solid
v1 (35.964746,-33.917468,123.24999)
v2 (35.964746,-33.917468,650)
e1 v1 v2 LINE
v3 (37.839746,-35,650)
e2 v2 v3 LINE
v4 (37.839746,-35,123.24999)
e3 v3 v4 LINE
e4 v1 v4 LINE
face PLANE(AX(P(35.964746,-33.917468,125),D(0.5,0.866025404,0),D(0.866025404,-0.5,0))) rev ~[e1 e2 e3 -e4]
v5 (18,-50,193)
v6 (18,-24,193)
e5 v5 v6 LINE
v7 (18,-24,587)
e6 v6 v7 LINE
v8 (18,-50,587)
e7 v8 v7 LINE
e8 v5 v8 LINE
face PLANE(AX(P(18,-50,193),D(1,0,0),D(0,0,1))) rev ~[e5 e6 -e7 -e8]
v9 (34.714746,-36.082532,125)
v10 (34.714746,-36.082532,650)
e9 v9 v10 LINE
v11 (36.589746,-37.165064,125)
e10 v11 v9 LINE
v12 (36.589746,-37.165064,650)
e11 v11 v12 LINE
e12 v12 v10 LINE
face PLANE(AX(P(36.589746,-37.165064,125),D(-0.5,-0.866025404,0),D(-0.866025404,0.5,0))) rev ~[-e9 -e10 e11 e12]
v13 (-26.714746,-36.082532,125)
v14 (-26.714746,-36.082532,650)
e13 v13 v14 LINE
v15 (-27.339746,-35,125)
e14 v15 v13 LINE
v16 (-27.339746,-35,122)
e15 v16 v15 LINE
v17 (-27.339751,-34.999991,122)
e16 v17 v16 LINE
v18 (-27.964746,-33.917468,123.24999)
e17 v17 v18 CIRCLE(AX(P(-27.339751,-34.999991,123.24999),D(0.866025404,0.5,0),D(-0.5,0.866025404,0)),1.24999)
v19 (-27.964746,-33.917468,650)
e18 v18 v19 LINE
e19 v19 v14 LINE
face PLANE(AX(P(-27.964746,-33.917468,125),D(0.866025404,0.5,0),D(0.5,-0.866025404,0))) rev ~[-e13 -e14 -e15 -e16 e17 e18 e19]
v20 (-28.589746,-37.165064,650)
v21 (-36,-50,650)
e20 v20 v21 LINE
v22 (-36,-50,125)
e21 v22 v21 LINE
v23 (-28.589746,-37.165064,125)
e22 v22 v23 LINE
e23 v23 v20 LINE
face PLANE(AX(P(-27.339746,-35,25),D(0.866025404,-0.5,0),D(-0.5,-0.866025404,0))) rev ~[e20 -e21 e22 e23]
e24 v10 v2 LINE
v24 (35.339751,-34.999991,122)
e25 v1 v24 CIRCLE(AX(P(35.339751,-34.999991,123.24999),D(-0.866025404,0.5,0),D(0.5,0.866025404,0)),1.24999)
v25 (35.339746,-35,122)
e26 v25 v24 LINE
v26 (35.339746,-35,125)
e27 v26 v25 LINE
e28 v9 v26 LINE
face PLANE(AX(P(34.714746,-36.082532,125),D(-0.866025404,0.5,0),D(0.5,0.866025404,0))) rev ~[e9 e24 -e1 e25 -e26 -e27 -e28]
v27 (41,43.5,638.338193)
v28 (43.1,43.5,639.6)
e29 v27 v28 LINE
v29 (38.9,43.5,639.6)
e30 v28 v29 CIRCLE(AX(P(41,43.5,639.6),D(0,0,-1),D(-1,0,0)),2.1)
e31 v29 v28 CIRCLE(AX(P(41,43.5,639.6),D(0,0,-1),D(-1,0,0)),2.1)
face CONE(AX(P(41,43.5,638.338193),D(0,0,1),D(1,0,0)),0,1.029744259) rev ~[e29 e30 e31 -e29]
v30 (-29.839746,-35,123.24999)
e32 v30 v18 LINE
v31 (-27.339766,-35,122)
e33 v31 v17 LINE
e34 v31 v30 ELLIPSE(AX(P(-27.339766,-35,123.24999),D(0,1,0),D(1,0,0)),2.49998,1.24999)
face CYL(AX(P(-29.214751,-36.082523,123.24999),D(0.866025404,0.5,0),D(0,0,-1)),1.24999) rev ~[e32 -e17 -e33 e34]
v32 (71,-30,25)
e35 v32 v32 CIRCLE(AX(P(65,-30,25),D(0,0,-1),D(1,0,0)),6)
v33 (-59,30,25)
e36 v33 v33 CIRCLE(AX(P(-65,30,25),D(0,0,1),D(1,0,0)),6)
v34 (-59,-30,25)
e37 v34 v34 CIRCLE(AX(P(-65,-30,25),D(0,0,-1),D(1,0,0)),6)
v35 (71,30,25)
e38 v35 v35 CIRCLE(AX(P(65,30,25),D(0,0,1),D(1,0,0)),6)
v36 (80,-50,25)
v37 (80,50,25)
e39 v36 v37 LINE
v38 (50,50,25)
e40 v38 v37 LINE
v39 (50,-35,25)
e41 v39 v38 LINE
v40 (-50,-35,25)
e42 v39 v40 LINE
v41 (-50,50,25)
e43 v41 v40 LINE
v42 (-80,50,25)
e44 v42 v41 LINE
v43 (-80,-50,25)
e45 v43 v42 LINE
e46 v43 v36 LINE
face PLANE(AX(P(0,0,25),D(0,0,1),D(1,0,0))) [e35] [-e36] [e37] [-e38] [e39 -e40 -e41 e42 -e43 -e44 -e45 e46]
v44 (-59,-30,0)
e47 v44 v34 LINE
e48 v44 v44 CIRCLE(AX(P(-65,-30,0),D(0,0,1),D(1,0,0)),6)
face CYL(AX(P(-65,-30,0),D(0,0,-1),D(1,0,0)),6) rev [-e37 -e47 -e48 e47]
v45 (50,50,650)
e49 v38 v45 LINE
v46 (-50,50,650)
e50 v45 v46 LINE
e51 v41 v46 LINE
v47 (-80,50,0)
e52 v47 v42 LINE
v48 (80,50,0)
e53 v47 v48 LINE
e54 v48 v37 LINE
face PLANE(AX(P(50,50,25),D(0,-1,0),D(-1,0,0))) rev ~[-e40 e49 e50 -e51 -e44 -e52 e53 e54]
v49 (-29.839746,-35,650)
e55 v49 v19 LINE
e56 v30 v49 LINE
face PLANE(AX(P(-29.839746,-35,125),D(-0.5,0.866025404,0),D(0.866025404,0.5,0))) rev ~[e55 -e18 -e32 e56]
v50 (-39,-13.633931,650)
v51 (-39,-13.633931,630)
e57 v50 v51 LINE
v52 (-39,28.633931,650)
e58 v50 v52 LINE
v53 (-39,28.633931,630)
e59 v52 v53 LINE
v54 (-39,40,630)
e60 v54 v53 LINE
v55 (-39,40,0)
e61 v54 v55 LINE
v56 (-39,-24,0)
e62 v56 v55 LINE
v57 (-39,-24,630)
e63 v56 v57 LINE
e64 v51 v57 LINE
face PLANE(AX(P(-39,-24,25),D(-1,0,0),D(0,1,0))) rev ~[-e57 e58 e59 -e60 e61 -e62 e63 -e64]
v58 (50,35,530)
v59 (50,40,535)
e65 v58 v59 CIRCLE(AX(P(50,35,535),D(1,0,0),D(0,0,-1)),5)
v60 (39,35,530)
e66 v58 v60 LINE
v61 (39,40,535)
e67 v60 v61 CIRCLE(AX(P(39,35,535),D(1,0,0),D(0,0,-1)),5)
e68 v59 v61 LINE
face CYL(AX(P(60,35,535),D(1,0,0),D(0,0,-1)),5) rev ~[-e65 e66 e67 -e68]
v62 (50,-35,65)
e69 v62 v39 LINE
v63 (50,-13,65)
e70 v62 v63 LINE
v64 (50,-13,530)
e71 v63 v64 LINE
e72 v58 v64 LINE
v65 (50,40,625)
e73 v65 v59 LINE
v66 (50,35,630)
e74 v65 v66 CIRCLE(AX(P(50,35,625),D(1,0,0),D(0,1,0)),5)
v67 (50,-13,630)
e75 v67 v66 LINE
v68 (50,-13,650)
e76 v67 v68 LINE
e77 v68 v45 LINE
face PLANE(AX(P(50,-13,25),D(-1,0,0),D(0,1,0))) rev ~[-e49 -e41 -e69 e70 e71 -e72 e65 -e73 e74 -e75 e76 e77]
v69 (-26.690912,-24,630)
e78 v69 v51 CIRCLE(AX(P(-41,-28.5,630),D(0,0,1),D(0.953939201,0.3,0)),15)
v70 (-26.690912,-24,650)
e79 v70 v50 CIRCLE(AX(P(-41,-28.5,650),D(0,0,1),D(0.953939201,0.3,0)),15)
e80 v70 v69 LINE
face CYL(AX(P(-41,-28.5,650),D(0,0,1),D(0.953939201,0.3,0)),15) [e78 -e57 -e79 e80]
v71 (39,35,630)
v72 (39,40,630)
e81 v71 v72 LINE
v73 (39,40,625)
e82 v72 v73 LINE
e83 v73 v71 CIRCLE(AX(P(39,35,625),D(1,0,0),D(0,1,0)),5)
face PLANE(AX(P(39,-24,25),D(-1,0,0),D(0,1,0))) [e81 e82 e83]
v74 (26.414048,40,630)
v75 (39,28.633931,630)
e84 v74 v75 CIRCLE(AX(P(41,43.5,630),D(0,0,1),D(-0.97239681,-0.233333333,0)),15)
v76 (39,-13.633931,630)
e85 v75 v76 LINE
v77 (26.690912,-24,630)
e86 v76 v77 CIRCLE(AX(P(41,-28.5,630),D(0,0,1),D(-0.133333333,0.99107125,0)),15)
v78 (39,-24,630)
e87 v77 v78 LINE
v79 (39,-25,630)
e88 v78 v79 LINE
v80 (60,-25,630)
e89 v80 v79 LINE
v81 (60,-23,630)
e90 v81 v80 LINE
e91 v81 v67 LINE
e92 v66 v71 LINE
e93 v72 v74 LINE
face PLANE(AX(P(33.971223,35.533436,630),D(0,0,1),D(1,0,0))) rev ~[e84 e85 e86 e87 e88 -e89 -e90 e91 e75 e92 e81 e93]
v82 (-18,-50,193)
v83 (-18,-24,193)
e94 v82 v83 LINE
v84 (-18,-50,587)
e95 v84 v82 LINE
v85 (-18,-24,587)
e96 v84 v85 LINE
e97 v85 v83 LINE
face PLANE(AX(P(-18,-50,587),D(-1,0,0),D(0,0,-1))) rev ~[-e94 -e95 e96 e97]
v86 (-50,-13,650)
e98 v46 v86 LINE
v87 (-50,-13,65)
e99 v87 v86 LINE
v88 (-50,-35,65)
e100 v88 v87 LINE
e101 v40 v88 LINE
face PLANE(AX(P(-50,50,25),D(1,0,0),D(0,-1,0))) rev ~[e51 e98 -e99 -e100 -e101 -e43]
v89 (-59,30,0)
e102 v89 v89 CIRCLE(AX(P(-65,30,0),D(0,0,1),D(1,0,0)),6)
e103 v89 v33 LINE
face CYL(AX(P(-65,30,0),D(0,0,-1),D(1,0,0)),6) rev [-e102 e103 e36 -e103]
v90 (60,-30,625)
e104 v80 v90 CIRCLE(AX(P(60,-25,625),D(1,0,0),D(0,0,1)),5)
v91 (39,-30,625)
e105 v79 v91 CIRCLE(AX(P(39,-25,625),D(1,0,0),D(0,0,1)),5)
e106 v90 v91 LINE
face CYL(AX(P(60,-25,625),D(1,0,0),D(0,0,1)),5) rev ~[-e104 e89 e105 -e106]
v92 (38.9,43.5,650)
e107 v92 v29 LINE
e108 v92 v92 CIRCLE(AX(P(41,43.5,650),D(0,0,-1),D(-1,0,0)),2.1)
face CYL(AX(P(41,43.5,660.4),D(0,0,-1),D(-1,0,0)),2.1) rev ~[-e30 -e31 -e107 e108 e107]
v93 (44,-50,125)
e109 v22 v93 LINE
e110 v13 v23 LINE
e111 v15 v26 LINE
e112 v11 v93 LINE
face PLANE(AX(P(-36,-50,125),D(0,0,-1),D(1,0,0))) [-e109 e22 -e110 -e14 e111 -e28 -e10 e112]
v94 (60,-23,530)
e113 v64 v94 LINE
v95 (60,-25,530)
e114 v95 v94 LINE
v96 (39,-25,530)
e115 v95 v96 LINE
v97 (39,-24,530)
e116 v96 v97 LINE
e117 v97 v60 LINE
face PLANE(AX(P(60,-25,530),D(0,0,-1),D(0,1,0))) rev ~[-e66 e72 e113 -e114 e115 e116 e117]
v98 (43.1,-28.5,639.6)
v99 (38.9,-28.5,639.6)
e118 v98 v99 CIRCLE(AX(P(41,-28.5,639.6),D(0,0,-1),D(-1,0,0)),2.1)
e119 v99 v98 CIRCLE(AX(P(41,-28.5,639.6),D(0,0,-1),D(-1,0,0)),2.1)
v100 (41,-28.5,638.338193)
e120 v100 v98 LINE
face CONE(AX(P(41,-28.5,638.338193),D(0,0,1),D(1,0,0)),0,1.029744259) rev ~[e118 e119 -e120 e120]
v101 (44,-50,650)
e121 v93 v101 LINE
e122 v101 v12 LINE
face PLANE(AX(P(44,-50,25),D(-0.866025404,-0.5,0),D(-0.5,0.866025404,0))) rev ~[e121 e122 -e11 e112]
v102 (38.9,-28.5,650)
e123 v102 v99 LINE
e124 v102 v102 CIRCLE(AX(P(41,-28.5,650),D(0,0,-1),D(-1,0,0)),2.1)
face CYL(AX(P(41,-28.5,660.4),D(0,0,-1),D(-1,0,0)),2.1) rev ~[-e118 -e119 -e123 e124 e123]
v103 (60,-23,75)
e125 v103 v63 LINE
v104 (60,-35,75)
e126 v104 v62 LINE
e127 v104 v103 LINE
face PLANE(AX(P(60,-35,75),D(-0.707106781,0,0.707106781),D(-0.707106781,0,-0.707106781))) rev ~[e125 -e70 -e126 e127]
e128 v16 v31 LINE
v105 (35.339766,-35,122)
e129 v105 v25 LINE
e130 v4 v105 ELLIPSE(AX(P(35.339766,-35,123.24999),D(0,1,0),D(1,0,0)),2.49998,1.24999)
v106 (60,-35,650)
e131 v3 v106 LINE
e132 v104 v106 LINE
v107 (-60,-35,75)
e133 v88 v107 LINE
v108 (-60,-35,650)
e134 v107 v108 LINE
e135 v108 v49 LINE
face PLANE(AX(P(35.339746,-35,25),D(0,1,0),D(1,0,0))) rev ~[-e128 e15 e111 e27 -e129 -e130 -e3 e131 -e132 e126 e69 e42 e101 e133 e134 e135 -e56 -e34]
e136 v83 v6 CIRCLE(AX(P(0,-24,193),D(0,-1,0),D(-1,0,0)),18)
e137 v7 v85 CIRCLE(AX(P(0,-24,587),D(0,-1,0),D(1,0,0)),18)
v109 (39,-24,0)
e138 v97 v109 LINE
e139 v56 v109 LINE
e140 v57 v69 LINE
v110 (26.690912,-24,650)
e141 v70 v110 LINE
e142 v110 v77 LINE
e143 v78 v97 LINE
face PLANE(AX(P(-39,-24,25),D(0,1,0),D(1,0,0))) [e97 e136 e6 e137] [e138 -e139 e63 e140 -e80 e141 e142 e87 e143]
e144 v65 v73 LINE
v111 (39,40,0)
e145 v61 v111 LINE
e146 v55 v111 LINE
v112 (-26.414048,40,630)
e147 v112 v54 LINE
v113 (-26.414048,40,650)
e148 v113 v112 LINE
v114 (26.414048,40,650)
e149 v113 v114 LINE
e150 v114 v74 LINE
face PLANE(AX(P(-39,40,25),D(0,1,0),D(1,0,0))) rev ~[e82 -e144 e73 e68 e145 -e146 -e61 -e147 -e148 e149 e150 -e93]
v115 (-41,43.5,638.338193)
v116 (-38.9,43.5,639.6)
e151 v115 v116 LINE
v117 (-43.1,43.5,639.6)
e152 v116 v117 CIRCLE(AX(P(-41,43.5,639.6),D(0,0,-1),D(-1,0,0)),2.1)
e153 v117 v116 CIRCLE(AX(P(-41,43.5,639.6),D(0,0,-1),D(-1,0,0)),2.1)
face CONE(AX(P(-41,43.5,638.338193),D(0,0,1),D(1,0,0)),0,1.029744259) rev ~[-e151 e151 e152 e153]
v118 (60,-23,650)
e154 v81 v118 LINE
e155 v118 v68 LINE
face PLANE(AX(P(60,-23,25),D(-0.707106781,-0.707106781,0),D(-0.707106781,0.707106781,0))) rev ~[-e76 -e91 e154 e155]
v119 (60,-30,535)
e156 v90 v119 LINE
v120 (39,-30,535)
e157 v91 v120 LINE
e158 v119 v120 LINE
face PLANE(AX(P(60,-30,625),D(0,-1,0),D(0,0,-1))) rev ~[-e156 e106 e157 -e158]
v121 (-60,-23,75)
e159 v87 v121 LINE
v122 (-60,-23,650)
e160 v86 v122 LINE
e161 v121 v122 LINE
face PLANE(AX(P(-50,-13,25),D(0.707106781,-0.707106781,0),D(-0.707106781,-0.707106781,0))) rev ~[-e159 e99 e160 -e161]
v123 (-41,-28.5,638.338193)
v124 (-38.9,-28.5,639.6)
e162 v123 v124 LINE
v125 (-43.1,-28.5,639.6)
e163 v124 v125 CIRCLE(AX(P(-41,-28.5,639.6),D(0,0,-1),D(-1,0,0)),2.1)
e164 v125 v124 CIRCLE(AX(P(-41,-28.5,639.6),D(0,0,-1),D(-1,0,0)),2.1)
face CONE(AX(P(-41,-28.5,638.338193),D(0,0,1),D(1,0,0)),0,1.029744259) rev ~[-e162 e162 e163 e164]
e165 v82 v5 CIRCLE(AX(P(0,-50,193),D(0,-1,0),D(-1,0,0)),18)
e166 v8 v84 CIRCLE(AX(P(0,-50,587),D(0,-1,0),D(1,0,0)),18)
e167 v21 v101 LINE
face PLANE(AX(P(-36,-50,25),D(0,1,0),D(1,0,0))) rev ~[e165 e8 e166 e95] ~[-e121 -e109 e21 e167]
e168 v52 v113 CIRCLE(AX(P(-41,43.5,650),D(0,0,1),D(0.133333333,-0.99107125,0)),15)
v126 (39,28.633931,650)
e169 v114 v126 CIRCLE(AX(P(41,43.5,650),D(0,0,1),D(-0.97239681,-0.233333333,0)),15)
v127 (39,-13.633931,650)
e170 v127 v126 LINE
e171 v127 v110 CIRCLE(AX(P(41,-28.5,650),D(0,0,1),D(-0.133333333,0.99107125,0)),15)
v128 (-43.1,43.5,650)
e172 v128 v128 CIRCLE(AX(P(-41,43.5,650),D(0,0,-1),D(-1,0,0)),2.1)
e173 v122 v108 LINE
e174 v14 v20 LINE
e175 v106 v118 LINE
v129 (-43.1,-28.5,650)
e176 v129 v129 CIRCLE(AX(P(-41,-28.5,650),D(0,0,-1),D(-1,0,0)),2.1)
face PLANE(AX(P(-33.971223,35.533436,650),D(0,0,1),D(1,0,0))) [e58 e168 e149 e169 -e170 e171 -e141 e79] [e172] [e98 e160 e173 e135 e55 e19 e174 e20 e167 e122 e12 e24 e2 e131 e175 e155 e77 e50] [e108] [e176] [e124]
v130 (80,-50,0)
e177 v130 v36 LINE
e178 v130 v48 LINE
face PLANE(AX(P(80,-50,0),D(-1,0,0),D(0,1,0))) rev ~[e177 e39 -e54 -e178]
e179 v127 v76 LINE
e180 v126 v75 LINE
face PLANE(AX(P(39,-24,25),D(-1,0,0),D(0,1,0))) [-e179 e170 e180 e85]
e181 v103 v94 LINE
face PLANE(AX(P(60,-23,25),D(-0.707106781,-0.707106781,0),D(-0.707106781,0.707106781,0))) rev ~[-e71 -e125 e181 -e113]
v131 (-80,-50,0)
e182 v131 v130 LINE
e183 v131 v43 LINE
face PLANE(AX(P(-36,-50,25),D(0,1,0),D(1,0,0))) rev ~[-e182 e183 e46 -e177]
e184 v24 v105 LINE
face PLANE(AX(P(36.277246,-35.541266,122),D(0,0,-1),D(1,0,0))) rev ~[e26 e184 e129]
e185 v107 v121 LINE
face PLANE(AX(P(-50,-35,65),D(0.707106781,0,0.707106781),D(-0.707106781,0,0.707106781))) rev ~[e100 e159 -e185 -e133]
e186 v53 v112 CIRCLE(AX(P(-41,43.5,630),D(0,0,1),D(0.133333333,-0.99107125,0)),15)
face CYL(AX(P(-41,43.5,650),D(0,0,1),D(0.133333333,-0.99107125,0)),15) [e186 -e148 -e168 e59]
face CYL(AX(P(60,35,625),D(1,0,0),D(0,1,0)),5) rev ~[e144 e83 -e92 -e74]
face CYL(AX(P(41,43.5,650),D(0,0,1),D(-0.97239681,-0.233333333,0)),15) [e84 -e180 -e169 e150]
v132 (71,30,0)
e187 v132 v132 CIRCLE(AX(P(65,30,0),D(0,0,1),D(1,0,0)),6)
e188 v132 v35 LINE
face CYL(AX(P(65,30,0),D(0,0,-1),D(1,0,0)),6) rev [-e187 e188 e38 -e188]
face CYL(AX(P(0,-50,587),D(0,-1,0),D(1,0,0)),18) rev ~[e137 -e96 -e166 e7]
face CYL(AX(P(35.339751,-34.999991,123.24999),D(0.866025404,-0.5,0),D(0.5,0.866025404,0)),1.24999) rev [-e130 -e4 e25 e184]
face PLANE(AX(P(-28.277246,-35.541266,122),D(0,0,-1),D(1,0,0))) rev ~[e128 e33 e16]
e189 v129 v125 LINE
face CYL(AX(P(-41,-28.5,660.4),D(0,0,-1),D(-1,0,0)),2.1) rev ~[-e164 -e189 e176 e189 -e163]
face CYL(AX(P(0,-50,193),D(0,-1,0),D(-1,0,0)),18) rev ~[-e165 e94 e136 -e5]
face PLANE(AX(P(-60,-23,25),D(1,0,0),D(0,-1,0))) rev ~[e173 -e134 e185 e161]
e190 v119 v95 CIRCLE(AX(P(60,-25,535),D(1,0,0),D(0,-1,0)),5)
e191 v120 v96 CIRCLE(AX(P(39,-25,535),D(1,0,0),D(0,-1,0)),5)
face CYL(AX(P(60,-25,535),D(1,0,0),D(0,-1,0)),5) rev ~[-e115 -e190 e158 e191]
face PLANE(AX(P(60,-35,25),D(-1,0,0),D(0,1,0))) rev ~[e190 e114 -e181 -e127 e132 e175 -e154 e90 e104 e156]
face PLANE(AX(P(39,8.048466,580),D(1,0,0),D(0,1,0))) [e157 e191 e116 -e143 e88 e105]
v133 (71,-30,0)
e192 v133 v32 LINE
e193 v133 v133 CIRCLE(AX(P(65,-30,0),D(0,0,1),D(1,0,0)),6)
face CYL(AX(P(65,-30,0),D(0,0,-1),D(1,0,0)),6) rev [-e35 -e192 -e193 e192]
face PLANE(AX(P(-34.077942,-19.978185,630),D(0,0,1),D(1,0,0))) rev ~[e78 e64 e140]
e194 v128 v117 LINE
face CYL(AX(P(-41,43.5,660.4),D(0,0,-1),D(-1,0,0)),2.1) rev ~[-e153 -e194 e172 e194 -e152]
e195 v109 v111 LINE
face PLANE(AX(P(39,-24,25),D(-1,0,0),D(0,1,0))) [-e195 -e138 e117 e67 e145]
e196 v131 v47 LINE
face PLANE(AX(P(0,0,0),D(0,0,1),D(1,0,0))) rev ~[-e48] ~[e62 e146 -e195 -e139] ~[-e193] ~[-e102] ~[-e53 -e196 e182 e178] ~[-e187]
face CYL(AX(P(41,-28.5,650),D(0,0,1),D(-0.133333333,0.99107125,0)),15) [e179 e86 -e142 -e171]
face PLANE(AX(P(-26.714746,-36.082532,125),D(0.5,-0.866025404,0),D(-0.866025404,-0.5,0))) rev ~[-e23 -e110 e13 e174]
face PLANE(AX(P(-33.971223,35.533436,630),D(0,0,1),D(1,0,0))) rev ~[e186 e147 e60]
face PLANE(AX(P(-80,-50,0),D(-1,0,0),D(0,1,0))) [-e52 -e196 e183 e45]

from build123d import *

# Parameters (mm, degrees)
F0_W           = 160
F0_H           = 100
F0_R           = 6
F0_W_2         = 78
F0_H_2         = 64
F1_DEPTH       = 25
F2_W           = 78
F2_H           = 64
F3_DEPTH       = 625
F5_DEPTH       = 26
F6_W           = 80
F6_H           = 100
F7_DEPTH       = 15
F9_DEPTH       = 22
F11_D          = 4.2
F11_DEPTH      = 10.4
F11_TIP        = 1.2618073
F13_DEPTH      = 20
F15_DEPTH      = 21
F17_DEPTH      = 525
F17_DEPTH_BACK = 3
F18_R          = 1.24999


# Not quite as in the source:
# - a fillet or chamfer is up to 0.001 mm smaller than in the source, because OpenCascade refuses the exact size


with BuildPart() as f1:
    # F0 (on Top) → F1 (new body)
    with BuildSketch(Plane.XY):
        Rectangle(F0_W, F0_H)
        with Locations((-65, -30)):
            Circle(F0_R, mode=Mode.SUBTRACT)
        with Locations((65, -30)):
            Circle(F0_R, mode=Mode.SUBTRACT)
        with Locations((-65, 30)):
            Circle(F0_R, mode=Mode.SUBTRACT)
        with Locations((0, 8)):
            Rectangle(F0_W_2, F0_H_2, mode=Mode.SUBTRACT)
        with Locations((65, 30)):
            Circle(F0_R, mode=Mode.SUBTRACT)
    extrude(amount=F1_DEPTH)

    # F2 (on face) → F3 (join)
    with BuildSketch(Plane.XY.offset(25)):
        Polygon((50, 50), (-50, 50), (-50, -13), (-60, -23), (-60, -35), (-27.3397459622, -35), (-36, -50), (44, -50), (35.3397459622, -35), (60, -35), (60, -23), (50, -13), align=None)
        with Locations((0, 8)):
            Rectangle(F2_W, F2_H, mode=Mode.SUBTRACT)
    extrude(amount=F3_DEPTH)

    # F4 (on face) → F5 (cut, through all)
    with BuildSketch(Plane.XZ.offset(50)):
        with BuildLine():
            ThreePointArc((-18, 193), (0, 175), (18, 193))
            Line((18, 193), (18, 587))
            ThreePointArc((18, 587), (0, 605), (-18, 587))
            Line((-18, 587), (-18, 193))
        make_face()
    extrude(amount=-F5_DEPTH, mode=Mode.SUBTRACT)

    # F6 (on face) → F7 (cut, through all)
    with BuildSketch(Plane.XZ.offset(50)):
        with Locations((4, 75)):
            Rectangle(F6_W, F6_H)
    extrude(amount=-F7_DEPTH, mode=Mode.SUBTRACT)

    # F8 (on face) → F9 (cut, through all)
    with BuildSketch(Plane.XZ.offset(35)):
        Polygon((-60, 75), (-60, 25), (-50, 25), (-50, 65), align=None)
        Polygon((50, 65), (50, 25), (60, 25), (60, 75), align=None)
    extrude(amount=-F9_DEPTH, mode=Mode.SUBTRACT)

    # F11
    with Locations(Plane.XY.offset(650)):
        with Locations((-41, 43.5), (41, 43.5), (41, -28.5), (-41, -28.5)):
            Hole(F11_D / 2, depth=F11_DEPTH)
            with Locations((0, 0, -(F11_DEPTH + F11_TIP / 2))):  # 118° drill point
                Cone(0, F11_D / 2, F11_TIP, mode=Mode.SUBTRACT)

    # F12 (on face) → F13 (join)
    with BuildSketch(Plane.XY.offset(650)):
        with BuildLine():
            Line((-39, 40), (-39, 28.6339312527))
            ThreePointArc((-39, 28.6339312527), (-30.9466258481, 32.367629715), (-26.4140478542, 40))
            Line((-26.4140478542, 40), (-39, 40))
        make_face()
        with BuildLine():
            Line((39, 40), (26.4140478542, 40))
            ThreePointArc((26.4140478542, 40), (30.9466258481, 32.367629715), (39, 28.6339312527))
            Line((39, 28.6339312527), (39, 40))
        make_face()
        with BuildLine():
            ThreePointArc((-26.6909119787, -24), (-31.3376797124, -17.0265712771), (-39, -13.6339312527))
            Line((-39, -13.6339312527), (-39, -24))
            Line((-39, -24), (-26.6909119787, -24))
        make_face()
        with BuildLine():
            ThreePointArc((39, -13.6339312527), (31.3376797124, -17.0265712771), (26.6909119787, -24))
            Line((26.6909119787, -24), (39, -24))
            Line((39, -24), (39, -13.6339312527))
        make_face()
    extrude(amount=-F13_DEPTH)

    # F14 (on face) → F15 (cut, through all)
    with BuildSketch(Plane.YZ.offset(60)):
        with BuildLine():
            Line((35, 630), (-23, 630))
            Line((-23, 630), (-23, 530))
            Line((-23, 530), (35, 530))
            ThreePointArc((35, 530), (38.5355339059, 531.4644660941), (40, 535))
            Line((40, 535), (40, 625))
            ThreePointArc((40, 625), (38.5355339059, 628.5355339059), (35, 630))
        make_face()
        with BuildLine():
            Line((-23, 630), (-25, 630))
            ThreePointArc((-25, 630), (-28.5355339059, 628.5355339059), (-30, 625))
            Line((-30, 625), (-30, 535))
            ThreePointArc((-30, 535), (-28.5355339059, 531.4644660941), (-25, 530))
            Line((-25, 530), (-23, 530))
            Line((-23, 530), (-23, 630))
        make_face()
    extrude(amount=-F15_DEPTH, mode=Mode.SUBTRACT)

    # F16 (on face) → F17 (cut, two sides)
    with BuildSketch(Plane(origin=(0, 0, 125), x_dir=(1, 0, 0), z_dir=(0, 0, -1))) as f17_sk:
        Polygon((36.5897459622, 37.1650635095), (34.7147459622, 36.0825317547), (35.9647459622, 33.9174682453), (37.8397459622, 35), align=None)
        Polygon((-27.9647459622, 33.9174682453), (-26.7147459622, 36.0825317547), (-28.5897459622, 37.1650635095), (-29.8397459622, 35), align=None)
    extrude(amount=-F17_DEPTH, mode=Mode.SUBTRACT)
    extrude(f17_sk.sketch, amount=F17_DEPTH_BACK, mode=Mode.SUBTRACT)

    # F18 (radius 1.25 in the source; OpenCascade refuses exactly that, so slightly less here)
    f18_edges = [f1.edges().sort_by_distance(p)[0] for p in [
        (36.902246, -34.458734, 122),
        (-28.902246, -34.458734, 122),
    ]]
    fillet(f18_edges, radius=F18_R)


solid = f1.part
